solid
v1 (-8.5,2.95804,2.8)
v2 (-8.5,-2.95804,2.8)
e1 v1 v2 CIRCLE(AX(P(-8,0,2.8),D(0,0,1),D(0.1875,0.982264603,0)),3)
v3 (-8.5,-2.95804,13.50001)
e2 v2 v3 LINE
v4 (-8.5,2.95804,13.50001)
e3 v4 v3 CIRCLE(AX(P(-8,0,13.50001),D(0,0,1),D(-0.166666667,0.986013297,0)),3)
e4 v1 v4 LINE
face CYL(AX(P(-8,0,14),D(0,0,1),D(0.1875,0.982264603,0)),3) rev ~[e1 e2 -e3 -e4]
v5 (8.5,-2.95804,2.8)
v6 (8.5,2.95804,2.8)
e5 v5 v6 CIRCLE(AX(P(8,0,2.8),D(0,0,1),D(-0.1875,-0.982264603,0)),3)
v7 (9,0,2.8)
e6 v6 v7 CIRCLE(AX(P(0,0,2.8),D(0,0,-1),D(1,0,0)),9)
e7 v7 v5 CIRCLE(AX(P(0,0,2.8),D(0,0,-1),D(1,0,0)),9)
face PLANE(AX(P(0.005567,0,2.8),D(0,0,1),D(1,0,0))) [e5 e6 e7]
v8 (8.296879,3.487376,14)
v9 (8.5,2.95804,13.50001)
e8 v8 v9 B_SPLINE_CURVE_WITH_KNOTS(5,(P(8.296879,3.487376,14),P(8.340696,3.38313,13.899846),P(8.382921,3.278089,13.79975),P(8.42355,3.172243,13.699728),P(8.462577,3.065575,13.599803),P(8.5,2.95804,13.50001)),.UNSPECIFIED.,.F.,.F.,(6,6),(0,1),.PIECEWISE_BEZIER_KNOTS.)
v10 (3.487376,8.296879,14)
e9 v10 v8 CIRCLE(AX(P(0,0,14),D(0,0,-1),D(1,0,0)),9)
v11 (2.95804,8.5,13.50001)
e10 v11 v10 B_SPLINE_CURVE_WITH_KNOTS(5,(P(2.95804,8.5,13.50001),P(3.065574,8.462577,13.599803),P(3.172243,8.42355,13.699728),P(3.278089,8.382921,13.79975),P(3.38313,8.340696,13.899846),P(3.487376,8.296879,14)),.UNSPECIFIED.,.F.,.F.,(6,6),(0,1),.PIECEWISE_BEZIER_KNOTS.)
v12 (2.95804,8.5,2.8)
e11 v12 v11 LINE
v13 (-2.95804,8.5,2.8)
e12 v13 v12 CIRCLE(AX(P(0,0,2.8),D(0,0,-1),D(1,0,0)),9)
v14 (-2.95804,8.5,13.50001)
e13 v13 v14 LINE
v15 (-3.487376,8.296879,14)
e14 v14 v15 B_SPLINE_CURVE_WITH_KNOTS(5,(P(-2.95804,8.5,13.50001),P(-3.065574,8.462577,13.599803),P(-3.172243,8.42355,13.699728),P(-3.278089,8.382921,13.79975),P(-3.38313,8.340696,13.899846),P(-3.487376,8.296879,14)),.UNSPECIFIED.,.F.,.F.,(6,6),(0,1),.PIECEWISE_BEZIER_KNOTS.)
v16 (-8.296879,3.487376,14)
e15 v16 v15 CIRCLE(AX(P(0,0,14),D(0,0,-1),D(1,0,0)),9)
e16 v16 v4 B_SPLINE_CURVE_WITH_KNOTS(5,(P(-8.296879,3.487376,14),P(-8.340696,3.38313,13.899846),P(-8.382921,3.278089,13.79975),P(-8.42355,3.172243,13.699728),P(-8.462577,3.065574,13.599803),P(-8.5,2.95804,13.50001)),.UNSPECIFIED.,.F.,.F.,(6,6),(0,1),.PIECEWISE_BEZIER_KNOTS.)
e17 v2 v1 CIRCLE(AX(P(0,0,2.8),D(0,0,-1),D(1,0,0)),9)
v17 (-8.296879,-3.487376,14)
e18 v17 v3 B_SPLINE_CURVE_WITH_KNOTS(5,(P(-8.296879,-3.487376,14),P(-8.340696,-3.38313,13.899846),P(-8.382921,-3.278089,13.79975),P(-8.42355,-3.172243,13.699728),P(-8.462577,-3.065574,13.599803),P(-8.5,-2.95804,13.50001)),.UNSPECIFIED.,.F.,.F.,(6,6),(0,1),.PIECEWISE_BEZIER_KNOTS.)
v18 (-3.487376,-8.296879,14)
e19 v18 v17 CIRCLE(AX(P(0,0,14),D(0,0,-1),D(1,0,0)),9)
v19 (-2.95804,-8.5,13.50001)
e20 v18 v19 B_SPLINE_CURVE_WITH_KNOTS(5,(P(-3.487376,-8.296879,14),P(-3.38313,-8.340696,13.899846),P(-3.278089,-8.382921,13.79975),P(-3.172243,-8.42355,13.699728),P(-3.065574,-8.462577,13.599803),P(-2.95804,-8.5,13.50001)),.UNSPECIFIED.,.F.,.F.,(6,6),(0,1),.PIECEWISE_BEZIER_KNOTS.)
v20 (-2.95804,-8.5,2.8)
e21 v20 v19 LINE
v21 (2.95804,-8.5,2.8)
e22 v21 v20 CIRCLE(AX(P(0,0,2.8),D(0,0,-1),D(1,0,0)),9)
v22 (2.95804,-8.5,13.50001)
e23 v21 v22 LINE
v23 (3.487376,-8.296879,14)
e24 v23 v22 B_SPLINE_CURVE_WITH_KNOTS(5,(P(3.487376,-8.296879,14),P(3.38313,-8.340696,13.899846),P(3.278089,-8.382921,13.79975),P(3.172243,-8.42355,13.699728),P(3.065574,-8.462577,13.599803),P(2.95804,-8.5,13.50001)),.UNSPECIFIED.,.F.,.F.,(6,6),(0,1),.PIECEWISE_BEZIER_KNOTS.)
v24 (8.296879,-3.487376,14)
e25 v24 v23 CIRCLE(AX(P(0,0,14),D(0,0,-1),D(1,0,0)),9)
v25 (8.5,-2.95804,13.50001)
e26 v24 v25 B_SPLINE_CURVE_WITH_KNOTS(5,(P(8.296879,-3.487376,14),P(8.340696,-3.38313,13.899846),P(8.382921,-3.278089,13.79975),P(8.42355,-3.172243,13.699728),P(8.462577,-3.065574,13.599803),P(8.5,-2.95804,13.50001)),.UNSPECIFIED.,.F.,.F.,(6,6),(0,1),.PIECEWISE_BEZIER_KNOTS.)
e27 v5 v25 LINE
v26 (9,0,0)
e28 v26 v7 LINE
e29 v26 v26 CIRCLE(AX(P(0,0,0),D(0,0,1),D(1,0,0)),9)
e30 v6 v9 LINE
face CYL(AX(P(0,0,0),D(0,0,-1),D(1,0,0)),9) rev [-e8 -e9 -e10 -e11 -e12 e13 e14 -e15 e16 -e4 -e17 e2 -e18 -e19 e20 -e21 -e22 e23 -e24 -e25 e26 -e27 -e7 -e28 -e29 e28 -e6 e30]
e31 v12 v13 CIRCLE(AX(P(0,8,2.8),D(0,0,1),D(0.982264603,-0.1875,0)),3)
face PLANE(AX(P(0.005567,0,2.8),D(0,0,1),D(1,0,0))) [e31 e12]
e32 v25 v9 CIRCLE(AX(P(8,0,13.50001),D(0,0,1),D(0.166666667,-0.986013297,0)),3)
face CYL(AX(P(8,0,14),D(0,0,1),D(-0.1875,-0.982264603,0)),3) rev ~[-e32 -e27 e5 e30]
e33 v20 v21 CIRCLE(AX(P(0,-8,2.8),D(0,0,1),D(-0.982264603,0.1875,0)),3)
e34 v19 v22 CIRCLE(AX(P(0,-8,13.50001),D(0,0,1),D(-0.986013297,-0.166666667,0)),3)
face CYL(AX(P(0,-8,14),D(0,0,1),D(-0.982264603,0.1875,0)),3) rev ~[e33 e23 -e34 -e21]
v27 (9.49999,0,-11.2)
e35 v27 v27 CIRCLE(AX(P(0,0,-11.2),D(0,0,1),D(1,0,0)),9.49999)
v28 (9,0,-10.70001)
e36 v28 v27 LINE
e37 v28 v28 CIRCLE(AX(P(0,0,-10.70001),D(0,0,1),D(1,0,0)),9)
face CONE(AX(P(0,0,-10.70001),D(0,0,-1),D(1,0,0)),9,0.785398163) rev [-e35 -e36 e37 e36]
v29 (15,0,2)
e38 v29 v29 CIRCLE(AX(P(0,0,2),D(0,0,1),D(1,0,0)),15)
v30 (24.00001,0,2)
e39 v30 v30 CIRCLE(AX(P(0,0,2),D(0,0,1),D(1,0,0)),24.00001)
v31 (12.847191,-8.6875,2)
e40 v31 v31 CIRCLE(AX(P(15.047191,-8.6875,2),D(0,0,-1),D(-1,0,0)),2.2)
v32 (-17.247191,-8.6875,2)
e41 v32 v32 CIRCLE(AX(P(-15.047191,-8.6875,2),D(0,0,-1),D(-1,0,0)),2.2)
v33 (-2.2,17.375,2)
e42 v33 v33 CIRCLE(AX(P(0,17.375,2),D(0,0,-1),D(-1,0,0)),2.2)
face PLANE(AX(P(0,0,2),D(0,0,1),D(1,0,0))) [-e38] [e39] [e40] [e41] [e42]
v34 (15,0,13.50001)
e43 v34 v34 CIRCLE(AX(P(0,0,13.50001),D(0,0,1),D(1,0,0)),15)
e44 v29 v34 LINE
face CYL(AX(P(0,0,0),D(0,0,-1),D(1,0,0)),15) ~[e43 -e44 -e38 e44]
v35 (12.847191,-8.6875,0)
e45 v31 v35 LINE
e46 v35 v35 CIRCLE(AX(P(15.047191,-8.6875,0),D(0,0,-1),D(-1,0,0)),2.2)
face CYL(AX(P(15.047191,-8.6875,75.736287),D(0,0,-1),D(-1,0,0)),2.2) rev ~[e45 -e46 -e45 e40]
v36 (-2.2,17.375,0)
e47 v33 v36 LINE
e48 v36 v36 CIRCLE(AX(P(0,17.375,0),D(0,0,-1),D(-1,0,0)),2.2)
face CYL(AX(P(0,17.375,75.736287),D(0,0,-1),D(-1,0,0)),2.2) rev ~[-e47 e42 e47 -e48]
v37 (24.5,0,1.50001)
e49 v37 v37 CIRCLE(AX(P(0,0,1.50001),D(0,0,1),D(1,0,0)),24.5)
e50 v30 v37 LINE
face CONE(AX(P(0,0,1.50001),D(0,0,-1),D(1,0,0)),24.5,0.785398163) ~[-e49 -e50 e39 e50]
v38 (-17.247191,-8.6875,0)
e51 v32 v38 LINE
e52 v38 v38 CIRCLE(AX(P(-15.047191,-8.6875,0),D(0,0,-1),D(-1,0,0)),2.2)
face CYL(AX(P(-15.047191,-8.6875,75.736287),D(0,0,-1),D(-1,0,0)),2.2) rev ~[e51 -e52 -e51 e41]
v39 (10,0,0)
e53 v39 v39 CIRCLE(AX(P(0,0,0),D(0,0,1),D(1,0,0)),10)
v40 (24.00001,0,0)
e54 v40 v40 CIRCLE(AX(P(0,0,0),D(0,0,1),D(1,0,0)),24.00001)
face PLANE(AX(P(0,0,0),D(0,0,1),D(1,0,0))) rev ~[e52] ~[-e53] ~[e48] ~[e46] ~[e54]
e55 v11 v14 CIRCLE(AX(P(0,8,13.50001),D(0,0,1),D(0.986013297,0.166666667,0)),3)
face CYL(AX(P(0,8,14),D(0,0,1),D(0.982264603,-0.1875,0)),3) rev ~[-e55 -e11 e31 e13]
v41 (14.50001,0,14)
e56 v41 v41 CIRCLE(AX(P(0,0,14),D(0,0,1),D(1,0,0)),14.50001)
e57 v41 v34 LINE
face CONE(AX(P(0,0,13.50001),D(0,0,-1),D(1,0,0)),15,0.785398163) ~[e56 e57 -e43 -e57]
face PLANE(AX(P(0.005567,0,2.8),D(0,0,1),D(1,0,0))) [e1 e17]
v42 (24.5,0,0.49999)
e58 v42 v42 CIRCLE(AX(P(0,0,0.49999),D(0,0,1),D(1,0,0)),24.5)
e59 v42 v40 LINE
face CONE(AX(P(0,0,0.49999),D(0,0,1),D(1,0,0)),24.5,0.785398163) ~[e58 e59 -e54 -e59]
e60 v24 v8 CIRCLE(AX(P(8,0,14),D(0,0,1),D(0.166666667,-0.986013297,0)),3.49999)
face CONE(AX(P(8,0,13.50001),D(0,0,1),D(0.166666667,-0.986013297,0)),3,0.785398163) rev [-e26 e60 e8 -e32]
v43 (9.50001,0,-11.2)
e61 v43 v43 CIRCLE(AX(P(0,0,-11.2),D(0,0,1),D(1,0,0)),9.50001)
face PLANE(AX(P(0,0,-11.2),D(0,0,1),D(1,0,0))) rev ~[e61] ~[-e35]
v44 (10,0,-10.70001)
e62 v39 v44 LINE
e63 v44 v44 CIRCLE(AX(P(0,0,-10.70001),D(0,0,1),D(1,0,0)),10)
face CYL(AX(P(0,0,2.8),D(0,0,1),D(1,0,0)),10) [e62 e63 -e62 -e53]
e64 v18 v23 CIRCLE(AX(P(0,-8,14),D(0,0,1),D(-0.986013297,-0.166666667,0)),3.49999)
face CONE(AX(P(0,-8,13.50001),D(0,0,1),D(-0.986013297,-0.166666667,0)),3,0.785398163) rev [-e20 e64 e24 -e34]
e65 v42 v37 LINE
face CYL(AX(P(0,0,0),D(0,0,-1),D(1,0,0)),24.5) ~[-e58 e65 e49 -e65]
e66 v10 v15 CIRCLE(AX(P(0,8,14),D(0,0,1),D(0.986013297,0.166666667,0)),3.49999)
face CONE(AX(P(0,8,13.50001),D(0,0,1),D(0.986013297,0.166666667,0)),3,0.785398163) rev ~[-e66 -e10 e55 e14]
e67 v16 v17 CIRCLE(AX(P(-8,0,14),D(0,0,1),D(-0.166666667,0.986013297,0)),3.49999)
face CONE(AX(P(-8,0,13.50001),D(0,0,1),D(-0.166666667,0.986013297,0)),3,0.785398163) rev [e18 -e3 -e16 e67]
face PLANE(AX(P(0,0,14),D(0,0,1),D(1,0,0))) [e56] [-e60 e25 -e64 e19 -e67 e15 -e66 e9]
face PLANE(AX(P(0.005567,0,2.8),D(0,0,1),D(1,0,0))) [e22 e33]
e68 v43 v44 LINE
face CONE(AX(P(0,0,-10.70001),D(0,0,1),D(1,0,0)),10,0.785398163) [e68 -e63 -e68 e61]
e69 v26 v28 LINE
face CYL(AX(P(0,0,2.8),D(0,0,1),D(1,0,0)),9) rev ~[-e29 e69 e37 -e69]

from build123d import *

# Parameters (mm, degrees)
F0_R      = 24.5
F0_R_2    = 15
F1_DEPTH  = 2
F2_R      = 15
F3_DEPTH  = 14
F5_DEPTH  = 11.2
F6_R      = 10
F6_R_2    = 9
F7_DEPTH  = 14
F8_DEPTH  = 25
F10_D     = 4.4
F11_SIZE2 = 0.49999
F11_SIZE  = 0.49999


# Not quite as in the source:
# - a fillet or chamfer is up to 0.001 mm smaller than in the source, because OpenCascade refuses the exact size


with BuildPart() as f1:
    # F0 (on Top) → F1 (new body)
    with BuildSketch(Plane.XY):
        Circle(F0_R)
        Circle(F0_R_2, mode=Mode.SUBTRACT)
    extrude(amount=F1_DEPTH)

    # F2 (on Top) → F3 (join)
    with BuildSketch(Plane.XY):
        Circle(F2_R)
    extrude(amount=F3_DEPTH)

    # F4 (on face) → F5 (cut)
    with BuildSketch(Plane.XY.offset(14)):
        with BuildLine():
            ThreePointArc((7.4375, -2.9467938085), (7.8581168228, -1.5), (8, 0))
            ThreePointArc((8, 0), (7.8581168228, 1.5), (7.4375, 2.9467938085))
            ThreePointArc((7.4375, 2.9467938085), (5.6568542495, 5.6568542495), (2.9467938085, 7.4375))
            ThreePointArc((2.9467938085, 7.4375), (0, 8), (-2.9467938085, 7.4375))
            ThreePointArc((-2.9467938085, 7.4375), (-5.6568542495, 5.6568542495), (-7.4375, 2.9467938085))
            ThreePointArc((-7.4375, 2.9467938085), (-8, 0), (-7.4375, -2.9467938085))
            ThreePointArc((-7.4375, -2.9467938085), (-5.6568542495, -5.6568542495), (-2.9467938085, -7.4375))
            ThreePointArc((-2.9467938085, -7.4375), (0, -8), (2.9467938085, -7.4375))
            ThreePointArc((2.9467938085, -7.4375), (5.6568542495, -5.6568542495), (7.4375, -2.9467938085))
        make_face()
        with BuildLine():
            ThreePointArc((7.4375, 2.9467938085), (7.8581168228, 1.5), (8, 0))
            ThreePointArc((8, 0), (7.8581168228, -1.5), (7.4375, -2.9467938085))
            ThreePointArc((7.4375, -2.9467938085), (11, 0), (7.4375, 2.9467938085))
        make_face()
        with BuildLine():
            ThreePointArc((-2.9467938085, 7.4375), (0, 8), (2.9467938085, 7.4375))
            ThreePointArc((2.9467938085, 7.4375), (0, 11), (-2.9467938085, 7.4375))
        make_face()
        with BuildLine():
            ThreePointArc((-2.9467938085, -7.4375), (0, -11), (2.9467938085, -7.4375))
            ThreePointArc((2.9467938085, -7.4375), (0, -8), (-2.9467938085, -7.4375))
        make_face()
        with BuildLine():
            ThreePointArc((-7.4375, -2.9467938085), (-8, 0), (-7.4375, 2.9467938085))
            ThreePointArc((-7.4375, 2.9467938085), (-11, 0), (-7.4375, -2.9467938085))
        make_face()
    extrude(amount=-F5_DEPTH, mode=Mode.SUBTRACT)

    # F6 (on face) → F7 (join)
    with BuildSketch(Plane.XY.offset(2.8)):
        Circle(F6_R)
        Circle(F6_R_2, mode=Mode.SUBTRACT)
    extrude(amount=-F7_DEPTH)

    # F8 (cut): a face of the model
    f8_faces = [f1.faces().sort_by_distance(p)[0] for p in [
        (0, 0, 0),
    ]]
    extrude(f8_faces, amount=-F8_DEPTH, mode=Mode.SUBTRACT)

    # F10 (through all)
    with Locations(Plane.XY.offset(2)):
        with Locations((0, 17.375), (-15.0471913908, -8.6875), (15.0471913908, -8.6875)):
            Hole(F10_D / 2)

    # F11 (size 0.5 and 0.5 in the source; OpenCascade refuses exactly that, so slightly less here)
    f11_edges = [f1.edges().sort_by_distance(p)[0] for p in [
        (-15, 0, 14),
        (-24.5, 0, 2),
        (-24.5, 0, 0),
        (0, 11, 14),
        (11, 0, 14),
        (0, -11, 14),
        (-11, 0, 14),
        (-10, 0, -11.2),
        (-9, 0, -11.2),
    ]]
    chamfer(f11_edges, length=F11_SIZE, length2=F11_SIZE2)


solid = f1.part
